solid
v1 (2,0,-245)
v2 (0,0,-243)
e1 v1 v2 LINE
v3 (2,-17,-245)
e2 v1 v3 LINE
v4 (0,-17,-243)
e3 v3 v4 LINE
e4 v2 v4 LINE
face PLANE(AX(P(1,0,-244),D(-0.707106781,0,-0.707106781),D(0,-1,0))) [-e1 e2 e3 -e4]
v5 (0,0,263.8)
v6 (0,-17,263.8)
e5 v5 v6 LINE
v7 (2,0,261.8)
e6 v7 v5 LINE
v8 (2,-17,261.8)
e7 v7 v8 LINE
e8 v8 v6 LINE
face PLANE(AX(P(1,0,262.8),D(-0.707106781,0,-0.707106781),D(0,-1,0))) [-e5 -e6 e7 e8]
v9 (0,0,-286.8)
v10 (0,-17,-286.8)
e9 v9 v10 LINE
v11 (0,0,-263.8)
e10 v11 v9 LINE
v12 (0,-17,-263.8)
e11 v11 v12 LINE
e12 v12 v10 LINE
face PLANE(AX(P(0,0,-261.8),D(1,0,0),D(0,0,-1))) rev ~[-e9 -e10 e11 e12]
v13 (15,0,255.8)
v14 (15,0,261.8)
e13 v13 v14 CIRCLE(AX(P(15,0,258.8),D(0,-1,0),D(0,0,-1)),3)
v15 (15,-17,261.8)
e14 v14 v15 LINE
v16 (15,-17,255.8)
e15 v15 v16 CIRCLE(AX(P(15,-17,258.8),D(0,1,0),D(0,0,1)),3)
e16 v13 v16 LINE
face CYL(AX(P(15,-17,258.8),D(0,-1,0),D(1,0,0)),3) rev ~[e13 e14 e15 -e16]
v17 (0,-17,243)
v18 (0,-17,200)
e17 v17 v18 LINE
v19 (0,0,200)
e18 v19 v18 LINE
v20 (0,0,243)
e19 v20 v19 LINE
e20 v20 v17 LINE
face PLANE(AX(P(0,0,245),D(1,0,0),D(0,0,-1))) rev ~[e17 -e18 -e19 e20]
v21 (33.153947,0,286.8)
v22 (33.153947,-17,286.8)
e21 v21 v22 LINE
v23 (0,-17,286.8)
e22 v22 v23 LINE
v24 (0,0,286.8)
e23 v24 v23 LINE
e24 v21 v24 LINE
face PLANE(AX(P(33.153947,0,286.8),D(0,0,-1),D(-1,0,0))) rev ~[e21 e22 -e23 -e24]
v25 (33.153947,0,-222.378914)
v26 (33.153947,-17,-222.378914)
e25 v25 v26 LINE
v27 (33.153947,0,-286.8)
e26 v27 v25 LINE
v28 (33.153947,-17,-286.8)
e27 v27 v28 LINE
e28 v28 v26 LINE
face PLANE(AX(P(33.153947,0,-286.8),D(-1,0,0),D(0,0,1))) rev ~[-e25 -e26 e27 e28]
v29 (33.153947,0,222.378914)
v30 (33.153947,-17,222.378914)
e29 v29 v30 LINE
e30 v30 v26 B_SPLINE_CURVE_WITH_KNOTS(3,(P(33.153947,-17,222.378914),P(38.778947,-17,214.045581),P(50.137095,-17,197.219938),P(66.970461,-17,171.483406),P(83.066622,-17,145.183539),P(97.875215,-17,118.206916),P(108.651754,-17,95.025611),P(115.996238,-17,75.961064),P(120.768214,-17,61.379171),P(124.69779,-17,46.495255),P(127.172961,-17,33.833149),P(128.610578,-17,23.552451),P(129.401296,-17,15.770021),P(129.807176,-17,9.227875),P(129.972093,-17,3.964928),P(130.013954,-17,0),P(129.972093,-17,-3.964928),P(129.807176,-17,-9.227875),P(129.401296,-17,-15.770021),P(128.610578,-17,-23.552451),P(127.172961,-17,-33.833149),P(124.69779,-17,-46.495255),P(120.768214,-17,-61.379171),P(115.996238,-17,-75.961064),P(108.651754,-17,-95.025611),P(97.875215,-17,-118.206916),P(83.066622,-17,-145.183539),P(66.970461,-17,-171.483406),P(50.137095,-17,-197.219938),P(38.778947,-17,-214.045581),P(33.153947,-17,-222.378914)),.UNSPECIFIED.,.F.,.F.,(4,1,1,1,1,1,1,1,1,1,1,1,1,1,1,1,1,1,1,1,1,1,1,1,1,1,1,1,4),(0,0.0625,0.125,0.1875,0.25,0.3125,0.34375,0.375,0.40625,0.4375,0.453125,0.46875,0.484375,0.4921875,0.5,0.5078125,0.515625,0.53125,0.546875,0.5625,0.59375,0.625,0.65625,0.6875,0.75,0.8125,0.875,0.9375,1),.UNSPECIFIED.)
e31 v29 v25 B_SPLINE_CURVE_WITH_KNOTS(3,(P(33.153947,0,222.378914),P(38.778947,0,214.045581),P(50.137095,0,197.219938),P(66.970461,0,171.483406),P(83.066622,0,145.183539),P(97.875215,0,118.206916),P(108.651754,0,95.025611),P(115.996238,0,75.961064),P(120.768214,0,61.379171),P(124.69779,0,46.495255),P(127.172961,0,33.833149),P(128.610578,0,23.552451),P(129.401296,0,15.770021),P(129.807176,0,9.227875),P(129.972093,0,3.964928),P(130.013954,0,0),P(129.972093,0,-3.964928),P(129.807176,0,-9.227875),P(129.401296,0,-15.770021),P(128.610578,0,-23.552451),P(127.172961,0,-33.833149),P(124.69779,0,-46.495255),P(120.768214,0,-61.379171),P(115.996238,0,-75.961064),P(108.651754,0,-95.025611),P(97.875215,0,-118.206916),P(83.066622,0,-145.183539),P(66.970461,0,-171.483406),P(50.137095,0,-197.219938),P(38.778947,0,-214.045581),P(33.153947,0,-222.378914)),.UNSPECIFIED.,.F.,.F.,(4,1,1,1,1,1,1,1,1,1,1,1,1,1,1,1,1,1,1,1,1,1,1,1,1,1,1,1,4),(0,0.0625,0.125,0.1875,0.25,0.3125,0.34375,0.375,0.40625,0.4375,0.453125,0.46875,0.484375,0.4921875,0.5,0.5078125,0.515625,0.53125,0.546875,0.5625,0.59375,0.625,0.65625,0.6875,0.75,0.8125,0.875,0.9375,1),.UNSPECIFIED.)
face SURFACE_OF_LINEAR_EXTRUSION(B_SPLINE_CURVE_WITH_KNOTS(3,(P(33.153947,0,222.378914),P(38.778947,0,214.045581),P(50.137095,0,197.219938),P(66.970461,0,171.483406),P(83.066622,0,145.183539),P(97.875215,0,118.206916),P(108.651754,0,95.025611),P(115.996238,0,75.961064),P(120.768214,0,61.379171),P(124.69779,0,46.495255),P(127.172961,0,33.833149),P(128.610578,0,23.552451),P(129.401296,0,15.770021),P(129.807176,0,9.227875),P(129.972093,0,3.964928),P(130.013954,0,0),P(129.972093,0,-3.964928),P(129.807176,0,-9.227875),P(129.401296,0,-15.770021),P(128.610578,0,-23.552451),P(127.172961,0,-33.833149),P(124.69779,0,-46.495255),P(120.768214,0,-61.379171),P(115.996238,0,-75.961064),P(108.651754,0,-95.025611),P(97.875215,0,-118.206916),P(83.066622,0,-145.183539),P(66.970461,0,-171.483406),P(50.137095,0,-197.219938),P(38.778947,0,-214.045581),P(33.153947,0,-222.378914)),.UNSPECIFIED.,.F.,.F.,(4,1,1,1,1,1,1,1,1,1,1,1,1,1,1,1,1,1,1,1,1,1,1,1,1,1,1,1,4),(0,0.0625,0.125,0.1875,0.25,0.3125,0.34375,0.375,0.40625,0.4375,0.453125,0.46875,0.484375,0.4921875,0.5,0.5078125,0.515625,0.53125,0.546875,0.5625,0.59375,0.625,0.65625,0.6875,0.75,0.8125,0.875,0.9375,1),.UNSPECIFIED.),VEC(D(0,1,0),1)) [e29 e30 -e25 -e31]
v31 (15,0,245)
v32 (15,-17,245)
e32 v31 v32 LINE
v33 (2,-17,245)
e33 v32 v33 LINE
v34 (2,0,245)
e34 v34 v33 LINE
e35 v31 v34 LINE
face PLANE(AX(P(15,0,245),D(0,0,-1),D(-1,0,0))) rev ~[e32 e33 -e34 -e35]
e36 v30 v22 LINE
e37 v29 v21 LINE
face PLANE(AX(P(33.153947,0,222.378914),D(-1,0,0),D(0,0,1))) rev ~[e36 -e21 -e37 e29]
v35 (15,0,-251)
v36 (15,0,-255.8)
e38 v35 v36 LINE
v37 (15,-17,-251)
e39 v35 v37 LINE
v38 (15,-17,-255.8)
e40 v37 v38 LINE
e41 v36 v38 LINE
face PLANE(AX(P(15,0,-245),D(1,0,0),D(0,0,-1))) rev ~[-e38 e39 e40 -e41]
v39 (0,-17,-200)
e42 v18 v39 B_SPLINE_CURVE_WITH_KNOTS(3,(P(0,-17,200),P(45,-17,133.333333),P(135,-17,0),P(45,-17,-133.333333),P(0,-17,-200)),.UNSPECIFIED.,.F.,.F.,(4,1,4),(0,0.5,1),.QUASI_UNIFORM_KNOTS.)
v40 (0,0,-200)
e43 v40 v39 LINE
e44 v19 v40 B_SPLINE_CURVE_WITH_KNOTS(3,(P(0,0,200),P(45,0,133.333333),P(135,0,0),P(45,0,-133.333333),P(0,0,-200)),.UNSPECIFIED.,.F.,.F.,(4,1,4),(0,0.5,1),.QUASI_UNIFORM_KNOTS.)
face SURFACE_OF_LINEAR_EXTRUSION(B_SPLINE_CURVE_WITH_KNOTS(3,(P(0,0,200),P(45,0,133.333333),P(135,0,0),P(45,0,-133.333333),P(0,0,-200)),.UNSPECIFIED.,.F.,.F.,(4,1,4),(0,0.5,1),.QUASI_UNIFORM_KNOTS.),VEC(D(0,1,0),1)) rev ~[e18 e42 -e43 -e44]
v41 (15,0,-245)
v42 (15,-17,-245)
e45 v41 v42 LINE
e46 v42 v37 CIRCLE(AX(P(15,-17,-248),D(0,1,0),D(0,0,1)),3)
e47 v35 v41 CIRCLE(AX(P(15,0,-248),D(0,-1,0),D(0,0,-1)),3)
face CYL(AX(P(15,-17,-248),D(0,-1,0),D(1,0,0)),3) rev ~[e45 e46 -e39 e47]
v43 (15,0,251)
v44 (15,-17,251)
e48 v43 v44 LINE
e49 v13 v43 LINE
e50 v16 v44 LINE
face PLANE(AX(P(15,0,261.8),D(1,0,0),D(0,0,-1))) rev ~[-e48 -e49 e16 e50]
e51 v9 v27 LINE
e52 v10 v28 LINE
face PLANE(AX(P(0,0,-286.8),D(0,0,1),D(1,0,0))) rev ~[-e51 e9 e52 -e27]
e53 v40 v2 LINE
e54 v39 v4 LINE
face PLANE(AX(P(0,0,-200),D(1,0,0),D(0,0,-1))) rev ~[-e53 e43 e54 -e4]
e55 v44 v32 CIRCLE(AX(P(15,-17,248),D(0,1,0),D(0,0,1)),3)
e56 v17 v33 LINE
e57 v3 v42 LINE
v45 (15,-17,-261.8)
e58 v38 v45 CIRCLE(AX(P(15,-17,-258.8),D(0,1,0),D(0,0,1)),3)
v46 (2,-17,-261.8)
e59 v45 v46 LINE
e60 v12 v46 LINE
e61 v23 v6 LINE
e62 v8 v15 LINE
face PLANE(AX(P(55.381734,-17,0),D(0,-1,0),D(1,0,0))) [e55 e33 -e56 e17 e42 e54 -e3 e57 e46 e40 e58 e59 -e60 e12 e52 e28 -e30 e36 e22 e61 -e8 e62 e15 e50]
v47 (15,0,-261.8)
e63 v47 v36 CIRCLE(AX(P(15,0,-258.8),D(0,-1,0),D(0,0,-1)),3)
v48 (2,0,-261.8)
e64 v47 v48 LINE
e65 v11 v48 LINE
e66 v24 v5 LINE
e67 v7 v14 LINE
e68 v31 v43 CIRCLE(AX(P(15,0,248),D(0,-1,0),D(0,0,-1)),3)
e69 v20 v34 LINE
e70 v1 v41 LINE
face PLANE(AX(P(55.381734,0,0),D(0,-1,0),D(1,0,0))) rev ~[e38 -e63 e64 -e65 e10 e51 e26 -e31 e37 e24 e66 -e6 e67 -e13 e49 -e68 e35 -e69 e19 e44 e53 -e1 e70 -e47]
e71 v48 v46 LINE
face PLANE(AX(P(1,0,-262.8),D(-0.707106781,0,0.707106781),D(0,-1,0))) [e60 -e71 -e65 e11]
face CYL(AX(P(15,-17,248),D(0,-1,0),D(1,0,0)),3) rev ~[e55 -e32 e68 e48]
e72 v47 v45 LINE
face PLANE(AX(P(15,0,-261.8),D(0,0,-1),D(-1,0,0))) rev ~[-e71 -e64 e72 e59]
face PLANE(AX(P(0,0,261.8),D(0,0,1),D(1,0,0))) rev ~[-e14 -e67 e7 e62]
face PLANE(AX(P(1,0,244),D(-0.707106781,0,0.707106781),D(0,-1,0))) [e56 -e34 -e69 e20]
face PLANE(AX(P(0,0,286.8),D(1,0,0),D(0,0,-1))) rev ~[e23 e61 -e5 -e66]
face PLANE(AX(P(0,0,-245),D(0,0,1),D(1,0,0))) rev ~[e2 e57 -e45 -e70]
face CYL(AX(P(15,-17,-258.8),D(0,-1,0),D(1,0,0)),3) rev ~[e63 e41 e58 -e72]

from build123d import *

# Parameters (mm, degrees)
F1_DEPTH = 17
F2_R     = 3
F3_DEPTH = 25
F4_SIZE  = 2


# Not quite as in the source:
# - the dataset's text gives a spline's control points without its knots; the knots are read off the source's solid


with BuildPart() as f1:
    # F0 (on Front) → F1 (new body)
    with BuildSketch(Plane.XZ):
        with BuildLine():
            Line((0, 245), (0, 200))
            add(Edge.make_bspline(
                [(0, 200), (45, 133.3333333333), (135, 0), (45, -133.3333333333), (0, -200)],
                knots=[0, 0, 0, 0, 0.5, 1, 1, 1, 1], degree=3))
            Line((0, -200), (0, -245))
            Line((0, -245), (15, -245))
            Line((15, -245), (15, -261.8))
            Line((15, -261.8), (0, -261.8))
            Line((0, -261.8), (0, -286.8))
            Line((0, -286.8), (33.153946963, -286.8))
            Line((33.153946963, -286.8), (33.153946963, -222.3789142))
            add(Edge.make_bspline(
                [(33.153946963, 222.3789142), (38.778946963, 214.0455808667), (50.1370946994, 197.2199375913), (66.9704607705, 171.4834064893), (83.0666221963, 145.1835388594), (97.8752152805, 118.2069155881), (108.6517536257, 95.0256105135), (115.9962383389, 75.9610643166), (120.768213582, 61.3791709128), (124.6977896579, 46.4952551717), (127.1729613057, 33.8331492243), (128.6105780855, 23.5524512191), (129.4012955844, 15.7700211508), (129.8071764378, 9.2278748435), (129.9720929215, 3.9649278514), (130.0139535392, 0), (129.9720929215, -3.9649278514), (129.8071764378, -9.2278748435), (129.4012955844, -15.7700211508), (128.6105780855, -23.5524512191), (127.1729613057, -33.8331492243), (124.6977896579, -46.4952551717), (120.768213582, -61.3791709128), (115.9962383389, -75.9610643166), (108.6517536257, -95.0256105135), (97.8752152805, -118.2069155881), (83.0666221963, -145.1835388594), (66.9704607705, -171.4834064893), (50.1370946994, -197.2199375913), (38.778946963, -214.0455808667), (33.153946963, -222.3789142)],
                knots=[0, 0, 0, 0, 0.0625, 0.125, 0.1875, 0.25, 0.3125, 0.34375, 0.375, 0.40625, 0.4375, 0.453125, 0.46875, 0.484375, 0.4921875, 0.5, 0.5078125, 0.515625, 0.53125, 0.546875, 0.5625, 0.59375, 0.625, 0.65625, 0.6875, 0.75, 0.8125, 0.875, 0.9375, 1, 1, 1, 1], degree=3))
            Line((33.153946963, 222.3789142), (33.153946963, 286.8))
            Line((33.153946963, 286.8), (0, 286.8))
            Line((0, 286.8), (0, 261.8))
            Line((0, 261.8), (15, 261.8))
            Line((15, 261.8), (15, 245))
            Line((15, 245), (0, 245))
        make_face()
    extrude(amount=F1_DEPTH)

    # F2 (on face) → F3 (cut)
    with BuildSketch(Plane.XZ.offset(17)):
        with Locations((15, 248)):
            Circle(F2_R)
        with Locations((15, 258.8)):
            Circle(F2_R)
        with Locations((15, -248)):
            Circle(F2_R)
        with Locations((15, -258.8)):
            Circle(F2_R)
    extrude(amount=-F3_DEPTH, mode=Mode.SUBTRACT)

    # F4
    f4_edges = [f1.edges().sort_by_distance(p)[0] for p in [
        (0, -8.5, 261.8),
        (0, -8.5, 245),
        (0, -8.5, -245),
        (0, -8.5, -261.8),
    ]]
    chamfer(f4_edges, length=F4_SIZE)


solid = f1.part
